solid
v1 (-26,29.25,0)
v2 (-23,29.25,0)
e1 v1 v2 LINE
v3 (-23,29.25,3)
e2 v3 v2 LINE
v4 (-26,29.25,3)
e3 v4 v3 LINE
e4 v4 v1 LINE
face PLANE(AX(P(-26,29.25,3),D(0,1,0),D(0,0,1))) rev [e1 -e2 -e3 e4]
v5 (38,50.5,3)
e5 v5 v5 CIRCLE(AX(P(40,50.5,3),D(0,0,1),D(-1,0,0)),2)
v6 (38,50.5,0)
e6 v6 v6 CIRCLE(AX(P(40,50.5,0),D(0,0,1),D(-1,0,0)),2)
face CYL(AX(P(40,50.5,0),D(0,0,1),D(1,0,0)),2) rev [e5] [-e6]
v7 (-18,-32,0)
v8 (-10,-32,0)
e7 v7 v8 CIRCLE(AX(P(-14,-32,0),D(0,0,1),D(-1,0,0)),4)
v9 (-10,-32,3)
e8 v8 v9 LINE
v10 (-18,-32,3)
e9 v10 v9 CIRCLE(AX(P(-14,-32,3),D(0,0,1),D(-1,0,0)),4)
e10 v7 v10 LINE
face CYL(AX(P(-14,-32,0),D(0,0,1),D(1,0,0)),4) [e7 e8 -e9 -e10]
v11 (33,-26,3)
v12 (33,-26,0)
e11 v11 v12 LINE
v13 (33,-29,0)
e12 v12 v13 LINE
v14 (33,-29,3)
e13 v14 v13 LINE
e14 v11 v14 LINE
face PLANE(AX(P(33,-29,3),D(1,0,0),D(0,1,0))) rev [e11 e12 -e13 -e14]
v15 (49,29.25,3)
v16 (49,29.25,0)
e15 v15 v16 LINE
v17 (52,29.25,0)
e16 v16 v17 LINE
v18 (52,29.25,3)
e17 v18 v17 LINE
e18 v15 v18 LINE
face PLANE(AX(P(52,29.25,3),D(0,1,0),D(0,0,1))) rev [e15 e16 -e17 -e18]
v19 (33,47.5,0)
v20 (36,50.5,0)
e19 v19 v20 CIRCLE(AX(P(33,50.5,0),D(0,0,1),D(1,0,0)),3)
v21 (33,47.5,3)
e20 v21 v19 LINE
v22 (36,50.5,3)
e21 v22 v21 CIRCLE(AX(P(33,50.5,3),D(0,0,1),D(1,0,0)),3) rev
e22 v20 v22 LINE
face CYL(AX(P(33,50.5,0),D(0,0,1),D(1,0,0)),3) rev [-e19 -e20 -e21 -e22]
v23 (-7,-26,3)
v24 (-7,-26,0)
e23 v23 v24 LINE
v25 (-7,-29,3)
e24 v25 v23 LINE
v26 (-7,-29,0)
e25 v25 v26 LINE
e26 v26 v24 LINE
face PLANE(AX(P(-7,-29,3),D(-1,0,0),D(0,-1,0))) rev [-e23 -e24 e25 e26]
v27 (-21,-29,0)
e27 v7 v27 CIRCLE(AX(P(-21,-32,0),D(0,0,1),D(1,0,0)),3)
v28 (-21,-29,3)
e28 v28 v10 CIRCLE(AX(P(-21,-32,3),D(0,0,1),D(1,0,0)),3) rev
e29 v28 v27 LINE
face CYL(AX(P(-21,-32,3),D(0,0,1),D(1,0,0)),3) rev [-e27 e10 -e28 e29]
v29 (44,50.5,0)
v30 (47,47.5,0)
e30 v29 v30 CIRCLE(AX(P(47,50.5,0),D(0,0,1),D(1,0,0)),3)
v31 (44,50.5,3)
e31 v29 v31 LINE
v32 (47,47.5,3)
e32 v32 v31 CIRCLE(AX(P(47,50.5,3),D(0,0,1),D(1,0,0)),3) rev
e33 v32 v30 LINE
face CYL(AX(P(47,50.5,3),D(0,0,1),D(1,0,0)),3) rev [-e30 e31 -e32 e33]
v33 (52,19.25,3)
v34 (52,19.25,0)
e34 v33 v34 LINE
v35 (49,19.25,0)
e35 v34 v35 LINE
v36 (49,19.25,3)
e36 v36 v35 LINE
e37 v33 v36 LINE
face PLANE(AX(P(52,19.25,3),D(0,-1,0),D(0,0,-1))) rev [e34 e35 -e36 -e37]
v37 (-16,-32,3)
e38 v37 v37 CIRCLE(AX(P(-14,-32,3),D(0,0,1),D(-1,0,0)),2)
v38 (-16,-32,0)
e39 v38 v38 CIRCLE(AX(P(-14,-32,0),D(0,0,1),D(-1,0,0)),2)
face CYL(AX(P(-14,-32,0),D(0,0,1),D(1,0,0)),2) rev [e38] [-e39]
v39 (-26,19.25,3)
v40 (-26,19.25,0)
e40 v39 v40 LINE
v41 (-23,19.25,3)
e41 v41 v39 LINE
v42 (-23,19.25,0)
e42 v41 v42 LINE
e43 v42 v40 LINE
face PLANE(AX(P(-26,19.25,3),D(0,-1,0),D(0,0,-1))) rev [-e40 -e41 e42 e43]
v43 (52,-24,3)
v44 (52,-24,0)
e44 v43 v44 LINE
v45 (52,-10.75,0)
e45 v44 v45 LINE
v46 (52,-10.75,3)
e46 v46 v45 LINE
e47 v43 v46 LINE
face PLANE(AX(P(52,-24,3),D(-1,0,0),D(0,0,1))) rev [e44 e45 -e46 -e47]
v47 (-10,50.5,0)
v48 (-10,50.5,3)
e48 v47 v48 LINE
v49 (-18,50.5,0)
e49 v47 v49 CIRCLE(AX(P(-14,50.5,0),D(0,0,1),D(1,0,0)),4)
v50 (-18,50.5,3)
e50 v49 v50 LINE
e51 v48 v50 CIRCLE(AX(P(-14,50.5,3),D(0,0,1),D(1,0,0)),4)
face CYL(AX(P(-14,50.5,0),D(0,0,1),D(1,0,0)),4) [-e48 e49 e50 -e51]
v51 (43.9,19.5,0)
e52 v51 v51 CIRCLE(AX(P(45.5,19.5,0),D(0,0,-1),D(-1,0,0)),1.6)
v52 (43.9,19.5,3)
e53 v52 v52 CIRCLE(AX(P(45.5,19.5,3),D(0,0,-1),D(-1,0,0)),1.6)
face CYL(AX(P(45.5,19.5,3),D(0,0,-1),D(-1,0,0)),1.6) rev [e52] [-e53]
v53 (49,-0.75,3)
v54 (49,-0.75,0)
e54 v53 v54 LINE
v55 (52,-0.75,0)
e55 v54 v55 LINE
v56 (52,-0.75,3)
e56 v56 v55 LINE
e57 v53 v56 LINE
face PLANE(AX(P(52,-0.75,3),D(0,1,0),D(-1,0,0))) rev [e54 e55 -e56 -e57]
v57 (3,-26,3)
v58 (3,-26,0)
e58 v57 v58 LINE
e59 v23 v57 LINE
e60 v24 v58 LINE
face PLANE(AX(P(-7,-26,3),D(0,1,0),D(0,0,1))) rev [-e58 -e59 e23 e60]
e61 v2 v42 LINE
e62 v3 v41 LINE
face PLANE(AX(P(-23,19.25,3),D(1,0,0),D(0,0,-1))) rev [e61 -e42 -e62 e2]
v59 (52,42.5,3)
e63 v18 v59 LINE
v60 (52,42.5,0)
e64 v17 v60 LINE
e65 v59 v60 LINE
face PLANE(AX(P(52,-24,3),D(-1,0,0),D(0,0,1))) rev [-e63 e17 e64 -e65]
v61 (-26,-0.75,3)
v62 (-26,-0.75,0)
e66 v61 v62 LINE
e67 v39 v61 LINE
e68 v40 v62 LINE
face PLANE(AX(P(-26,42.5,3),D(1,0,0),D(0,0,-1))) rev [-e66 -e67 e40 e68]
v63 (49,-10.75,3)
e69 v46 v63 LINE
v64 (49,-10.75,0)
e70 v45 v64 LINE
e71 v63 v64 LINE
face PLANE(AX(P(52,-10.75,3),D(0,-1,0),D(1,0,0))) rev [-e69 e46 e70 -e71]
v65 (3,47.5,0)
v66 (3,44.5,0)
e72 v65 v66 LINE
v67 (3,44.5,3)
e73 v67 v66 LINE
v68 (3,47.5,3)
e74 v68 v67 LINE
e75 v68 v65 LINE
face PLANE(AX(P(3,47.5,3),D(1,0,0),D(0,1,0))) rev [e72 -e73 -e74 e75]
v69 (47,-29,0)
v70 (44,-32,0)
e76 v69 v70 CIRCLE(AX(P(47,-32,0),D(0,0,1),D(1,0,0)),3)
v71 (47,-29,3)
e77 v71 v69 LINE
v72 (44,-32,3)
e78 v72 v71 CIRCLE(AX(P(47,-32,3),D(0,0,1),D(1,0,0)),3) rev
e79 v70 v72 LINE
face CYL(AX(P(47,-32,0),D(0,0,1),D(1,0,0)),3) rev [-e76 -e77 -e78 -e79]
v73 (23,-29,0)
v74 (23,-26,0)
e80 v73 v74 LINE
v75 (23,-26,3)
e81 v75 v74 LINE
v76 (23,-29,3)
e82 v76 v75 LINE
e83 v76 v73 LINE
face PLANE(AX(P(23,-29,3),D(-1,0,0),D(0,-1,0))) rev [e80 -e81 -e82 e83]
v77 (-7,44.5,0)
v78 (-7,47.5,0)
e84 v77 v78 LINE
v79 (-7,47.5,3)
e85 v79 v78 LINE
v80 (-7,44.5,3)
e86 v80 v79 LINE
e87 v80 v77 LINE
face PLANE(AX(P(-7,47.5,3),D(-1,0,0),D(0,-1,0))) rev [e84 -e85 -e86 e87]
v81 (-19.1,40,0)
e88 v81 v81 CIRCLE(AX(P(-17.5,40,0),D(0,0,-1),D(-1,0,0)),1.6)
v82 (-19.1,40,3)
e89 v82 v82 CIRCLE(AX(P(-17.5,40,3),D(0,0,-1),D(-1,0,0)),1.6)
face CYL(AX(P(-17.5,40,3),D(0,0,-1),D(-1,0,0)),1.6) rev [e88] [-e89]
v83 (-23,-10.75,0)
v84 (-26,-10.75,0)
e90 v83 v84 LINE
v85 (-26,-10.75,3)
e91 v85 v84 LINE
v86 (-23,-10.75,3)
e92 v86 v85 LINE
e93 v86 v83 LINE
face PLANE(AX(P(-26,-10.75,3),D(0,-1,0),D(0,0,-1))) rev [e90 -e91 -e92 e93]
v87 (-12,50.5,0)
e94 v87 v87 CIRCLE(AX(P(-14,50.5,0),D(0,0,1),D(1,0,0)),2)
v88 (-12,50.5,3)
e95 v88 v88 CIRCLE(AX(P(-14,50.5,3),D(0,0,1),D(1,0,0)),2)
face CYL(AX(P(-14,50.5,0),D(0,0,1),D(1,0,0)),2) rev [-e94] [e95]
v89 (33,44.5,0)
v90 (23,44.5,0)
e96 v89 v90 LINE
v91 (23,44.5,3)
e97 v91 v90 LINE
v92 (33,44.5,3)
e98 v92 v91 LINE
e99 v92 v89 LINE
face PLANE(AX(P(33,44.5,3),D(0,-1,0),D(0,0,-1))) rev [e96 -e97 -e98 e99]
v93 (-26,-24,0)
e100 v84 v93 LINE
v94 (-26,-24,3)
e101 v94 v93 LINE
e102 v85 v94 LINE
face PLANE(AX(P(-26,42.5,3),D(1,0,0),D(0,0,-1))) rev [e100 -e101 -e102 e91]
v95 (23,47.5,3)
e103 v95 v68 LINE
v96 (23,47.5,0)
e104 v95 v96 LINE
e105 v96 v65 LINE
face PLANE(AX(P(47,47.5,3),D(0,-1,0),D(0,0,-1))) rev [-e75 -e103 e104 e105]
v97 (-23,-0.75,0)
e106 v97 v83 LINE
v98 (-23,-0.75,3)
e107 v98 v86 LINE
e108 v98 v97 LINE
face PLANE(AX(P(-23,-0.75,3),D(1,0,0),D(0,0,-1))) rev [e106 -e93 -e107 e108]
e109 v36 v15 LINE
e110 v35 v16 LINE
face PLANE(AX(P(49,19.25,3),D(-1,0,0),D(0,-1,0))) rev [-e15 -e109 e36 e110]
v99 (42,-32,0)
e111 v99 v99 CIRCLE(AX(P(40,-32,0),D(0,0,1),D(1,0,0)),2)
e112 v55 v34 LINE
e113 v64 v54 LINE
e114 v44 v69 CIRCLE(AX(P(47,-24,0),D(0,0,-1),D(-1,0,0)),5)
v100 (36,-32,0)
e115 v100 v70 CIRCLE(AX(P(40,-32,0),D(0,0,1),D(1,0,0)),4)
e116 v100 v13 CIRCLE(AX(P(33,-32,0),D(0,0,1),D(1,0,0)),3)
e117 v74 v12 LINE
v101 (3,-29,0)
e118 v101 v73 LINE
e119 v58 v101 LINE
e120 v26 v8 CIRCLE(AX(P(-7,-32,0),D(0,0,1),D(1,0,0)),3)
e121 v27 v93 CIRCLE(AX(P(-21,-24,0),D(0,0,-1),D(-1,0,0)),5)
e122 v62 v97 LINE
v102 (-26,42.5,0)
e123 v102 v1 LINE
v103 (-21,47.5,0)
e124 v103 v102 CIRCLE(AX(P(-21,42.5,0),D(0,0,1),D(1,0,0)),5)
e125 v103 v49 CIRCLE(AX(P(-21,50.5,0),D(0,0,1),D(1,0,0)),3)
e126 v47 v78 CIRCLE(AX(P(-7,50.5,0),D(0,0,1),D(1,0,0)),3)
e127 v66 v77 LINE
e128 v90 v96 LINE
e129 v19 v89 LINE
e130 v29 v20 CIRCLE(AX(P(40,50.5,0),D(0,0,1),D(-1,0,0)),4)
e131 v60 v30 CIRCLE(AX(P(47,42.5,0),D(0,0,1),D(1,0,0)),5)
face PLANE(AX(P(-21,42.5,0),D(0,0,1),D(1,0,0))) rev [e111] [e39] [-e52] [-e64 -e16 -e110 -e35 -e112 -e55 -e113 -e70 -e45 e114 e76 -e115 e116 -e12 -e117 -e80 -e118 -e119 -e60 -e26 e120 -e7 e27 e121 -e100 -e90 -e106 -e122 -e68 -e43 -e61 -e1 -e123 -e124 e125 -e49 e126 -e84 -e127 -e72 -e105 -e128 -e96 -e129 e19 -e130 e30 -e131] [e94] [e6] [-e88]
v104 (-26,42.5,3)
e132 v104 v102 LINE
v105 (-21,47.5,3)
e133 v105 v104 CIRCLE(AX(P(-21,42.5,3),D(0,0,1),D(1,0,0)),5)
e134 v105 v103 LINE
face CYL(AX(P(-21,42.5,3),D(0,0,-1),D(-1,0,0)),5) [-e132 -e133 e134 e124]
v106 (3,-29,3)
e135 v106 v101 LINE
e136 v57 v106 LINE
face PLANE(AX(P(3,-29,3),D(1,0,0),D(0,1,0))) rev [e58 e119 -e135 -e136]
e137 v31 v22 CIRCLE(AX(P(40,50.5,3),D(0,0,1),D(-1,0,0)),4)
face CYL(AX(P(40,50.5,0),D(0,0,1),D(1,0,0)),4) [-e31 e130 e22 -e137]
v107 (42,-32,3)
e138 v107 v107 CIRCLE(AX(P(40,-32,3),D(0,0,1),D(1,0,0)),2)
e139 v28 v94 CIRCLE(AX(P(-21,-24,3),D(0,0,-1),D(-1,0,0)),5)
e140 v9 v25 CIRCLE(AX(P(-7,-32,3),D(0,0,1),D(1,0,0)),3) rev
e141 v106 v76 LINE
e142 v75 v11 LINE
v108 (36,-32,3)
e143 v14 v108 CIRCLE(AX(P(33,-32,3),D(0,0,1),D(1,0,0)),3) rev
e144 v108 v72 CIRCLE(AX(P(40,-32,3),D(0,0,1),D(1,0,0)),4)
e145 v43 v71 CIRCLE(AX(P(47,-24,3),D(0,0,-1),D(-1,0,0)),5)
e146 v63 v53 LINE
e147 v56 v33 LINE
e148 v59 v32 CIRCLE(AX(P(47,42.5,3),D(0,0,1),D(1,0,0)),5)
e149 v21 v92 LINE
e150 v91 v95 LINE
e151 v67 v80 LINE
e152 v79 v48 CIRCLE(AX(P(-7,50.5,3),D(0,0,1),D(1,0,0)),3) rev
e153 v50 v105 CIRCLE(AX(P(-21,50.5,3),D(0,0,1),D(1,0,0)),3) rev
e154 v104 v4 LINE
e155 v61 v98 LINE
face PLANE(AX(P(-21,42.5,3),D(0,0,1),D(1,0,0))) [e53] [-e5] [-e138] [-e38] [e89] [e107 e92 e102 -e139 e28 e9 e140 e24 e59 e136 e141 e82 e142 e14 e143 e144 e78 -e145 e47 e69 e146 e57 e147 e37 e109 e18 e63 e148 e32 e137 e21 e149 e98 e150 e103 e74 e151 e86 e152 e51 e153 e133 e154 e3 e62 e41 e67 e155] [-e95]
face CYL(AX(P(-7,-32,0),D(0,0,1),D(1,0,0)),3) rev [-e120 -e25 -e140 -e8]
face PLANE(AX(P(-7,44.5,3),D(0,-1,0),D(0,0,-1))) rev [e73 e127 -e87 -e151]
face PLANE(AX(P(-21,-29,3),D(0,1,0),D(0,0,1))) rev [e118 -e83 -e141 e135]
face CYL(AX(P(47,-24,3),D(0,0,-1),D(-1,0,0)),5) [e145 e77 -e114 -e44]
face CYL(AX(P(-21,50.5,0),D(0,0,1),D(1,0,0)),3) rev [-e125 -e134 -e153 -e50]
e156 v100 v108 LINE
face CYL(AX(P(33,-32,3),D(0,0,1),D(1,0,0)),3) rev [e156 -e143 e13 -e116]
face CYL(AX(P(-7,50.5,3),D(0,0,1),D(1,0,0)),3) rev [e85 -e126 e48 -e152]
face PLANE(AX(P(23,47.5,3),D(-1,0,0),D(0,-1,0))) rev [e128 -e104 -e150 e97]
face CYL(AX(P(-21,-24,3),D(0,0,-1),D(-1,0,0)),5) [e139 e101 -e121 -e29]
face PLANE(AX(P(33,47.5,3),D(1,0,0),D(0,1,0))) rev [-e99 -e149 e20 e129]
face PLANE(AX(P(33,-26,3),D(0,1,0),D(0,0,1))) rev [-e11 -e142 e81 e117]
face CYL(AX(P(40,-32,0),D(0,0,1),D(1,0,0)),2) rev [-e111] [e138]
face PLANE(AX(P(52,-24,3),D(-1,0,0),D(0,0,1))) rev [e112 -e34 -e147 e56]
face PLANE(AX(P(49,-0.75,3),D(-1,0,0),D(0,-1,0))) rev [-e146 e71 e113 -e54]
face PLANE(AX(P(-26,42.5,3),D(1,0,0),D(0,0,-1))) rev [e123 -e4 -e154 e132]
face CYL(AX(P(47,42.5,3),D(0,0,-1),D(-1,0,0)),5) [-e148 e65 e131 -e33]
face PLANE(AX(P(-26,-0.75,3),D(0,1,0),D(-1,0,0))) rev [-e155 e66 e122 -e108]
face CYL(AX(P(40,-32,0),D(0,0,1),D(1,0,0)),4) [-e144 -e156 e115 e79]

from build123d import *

# Parameters (mm, degrees)
BOSS_EXTRUDE1_DEPTH = 3
SKETCH3_R           = 1.6
CUT_EXTRUDE1_DEPTH  = 3
SKETCH4_W           = 3
SKETCH4_H           = 10
SKETCH4_W_2         = 10
SKETCH4_H_2         = 3
CUT_EXTRUDE2_DEPTH  = 3
SKETCH5_R           = 2
BOSS_EXTRUDE2_DEPTH = 3
FILLET1_R           = 3


with BuildPart() as part:
    # Sketch1 → Boss-Extrude1 (new body)
    with BuildSketch(Plane.XY):
        with BuildLine():
            Line((52, -24), (52, 42.5))
            ThreePointArc((52, 42.5), (50.535533906, 46.035533906), (47, 47.5))
            Line((47, 47.5), (-21, 47.5))
            ThreePointArc((-21, 47.5), (-24.535533906, 46.035533906), (-26, 42.5))
            Line((-26, 42.5), (-26, -24))
            ThreePointArc((-26, -24), (-24.535533906, -27.535533906), (-21, -29))
            Line((-21, -29), (47, -29))
            ThreePointArc((47, -29), (50.535533906, -27.535533906), (52, -24))
        make_face()
    extrude(amount=BOSS_EXTRUDE1_DEPTH)

    # Sketch3 → Cut-Extrude1 (cut)
    with BuildSketch(Plane(origin=(0, 0, 0), x_dir=(-1, 0, 0), z_dir=(0, 0, -1))):
        with Locations((17.5, 40)):
            Circle(SKETCH3_R)
        with Locations((-45.5, 19.5)):
            Circle(SKETCH3_R)
    extrude(amount=-CUT_EXTRUDE1_DEPTH, mode=Mode.SUBTRACT)

    # Sketch4 → Cut-Extrude2 (cut)
    with BuildSketch(Plane(origin=(0, 0, 0), x_dir=(-1, 0, 0), z_dir=(0, 0, -1))):
        with Locations((24.5, 24.25)):
            Rectangle(SKETCH4_W, SKETCH4_H)
        with Locations((24.5, -5.75)):
            Rectangle(SKETCH4_W, SKETCH4_H)
        with Locations((-50.5, -5.75)):
            Rectangle(SKETCH4_W, SKETCH4_H)
        with Locations((-50.5, 24.25)):
            Rectangle(SKETCH4_W, SKETCH4_H)
        with Locations((2, 46)):
            Rectangle(SKETCH4_W_2, SKETCH4_H_2)
        with Locations((-28, 46)):
            Rectangle(SKETCH4_W_2, SKETCH4_H_2)
        with Locations((-28, -27.5)):
            Rectangle(SKETCH4_W_2, SKETCH4_H_2)
        with Locations((2, -27.5)):
            Rectangle(SKETCH4_W_2, SKETCH4_H_2)
    extrude(amount=-CUT_EXTRUDE2_DEPTH, mode=Mode.SUBTRACT)

    # Sketch5 → Boss-Extrude2 (add)
    # profile 1 of 4: a face of its own
    with BuildSketch(Plane.XY.offset(3)):
        with BuildLine():
            Line((-18, 47.5), (-10, 47.5))
            Line((-10, 47.5), (-10, 50.5))
            ThreePointArc((-10, 50.5), (-14, 54.5), (-18, 50.5))
            Line((-18, 50.5), (-18, 47.5))
        make_face()
        with Locations((-14, 50.5)):
            Circle(SKETCH5_R, mode=Mode.SUBTRACT)
    # profile 2 of 4: a face of its own
    with BuildSketch(Plane.XY.offset(3)):
        with BuildLine():
            Line((36, 47.5), (36, 50.5))
            ThreePointArc((36, 50.5), (40, 54.5), (44, 50.5))
            Line((44, 50.5), (44, 47.5))
            Line((44, 47.5), (36, 47.5))
        make_face()
        with Locations(Location((40, 50.5, 0), (0, 0, 180))):
            Circle(SKETCH5_R, mode=Mode.SUBTRACT)
    # profile 3 of 4: a face of its own
    with BuildSketch(Plane.XY.offset(3)):
        with BuildLine():
            Line((44, -29), (36, -29))
            Line((36, -29), (36, -32))
            ThreePointArc((36, -32), (40, -36), (44, -32))
            Line((44, -32), (44, -29))
        make_face()
        with Locations((40, -32)):
            Circle(SKETCH5_R, mode=Mode.SUBTRACT)
    # profile 4 of 4: a face of its own
    with BuildSketch(Plane.XY.offset(3)):
        with BuildLine():
            Line((-10, -29), (-10, -32))
            ThreePointArc((-10, -32), (-14, -36), (-18, -32))
            Line((-18, -32), (-18, -29))
            Line((-18, -29), (-10, -29))
        make_face()
        with Locations(Location((-14, -32, 0), (0, 0, 180))):
            Circle(SKETCH5_R, mode=Mode.SUBTRACT)
    extrude(amount=-BOSS_EXTRUDE2_DEPTH)

    # Fillet1
    fillet1_edges = [part.edges().sort_by_distance(p)[0] for p in [
        (-10, 47.5, 1.5),
        (-18, 47.5, 1.5),
        (36, 47.5, 1.5),
        (44, 47.5, 1.5),
        (44, -29, 1.5),
        (36, -29, 1.5),
        (-10, -29, 1.5),
        (-18, -29, 1.5),
    ]]
    fillet(fillet1_edges, radius=FILLET1_R - 0.0001)  # a hair under: the kernel refuses the full size


solid = part.part
